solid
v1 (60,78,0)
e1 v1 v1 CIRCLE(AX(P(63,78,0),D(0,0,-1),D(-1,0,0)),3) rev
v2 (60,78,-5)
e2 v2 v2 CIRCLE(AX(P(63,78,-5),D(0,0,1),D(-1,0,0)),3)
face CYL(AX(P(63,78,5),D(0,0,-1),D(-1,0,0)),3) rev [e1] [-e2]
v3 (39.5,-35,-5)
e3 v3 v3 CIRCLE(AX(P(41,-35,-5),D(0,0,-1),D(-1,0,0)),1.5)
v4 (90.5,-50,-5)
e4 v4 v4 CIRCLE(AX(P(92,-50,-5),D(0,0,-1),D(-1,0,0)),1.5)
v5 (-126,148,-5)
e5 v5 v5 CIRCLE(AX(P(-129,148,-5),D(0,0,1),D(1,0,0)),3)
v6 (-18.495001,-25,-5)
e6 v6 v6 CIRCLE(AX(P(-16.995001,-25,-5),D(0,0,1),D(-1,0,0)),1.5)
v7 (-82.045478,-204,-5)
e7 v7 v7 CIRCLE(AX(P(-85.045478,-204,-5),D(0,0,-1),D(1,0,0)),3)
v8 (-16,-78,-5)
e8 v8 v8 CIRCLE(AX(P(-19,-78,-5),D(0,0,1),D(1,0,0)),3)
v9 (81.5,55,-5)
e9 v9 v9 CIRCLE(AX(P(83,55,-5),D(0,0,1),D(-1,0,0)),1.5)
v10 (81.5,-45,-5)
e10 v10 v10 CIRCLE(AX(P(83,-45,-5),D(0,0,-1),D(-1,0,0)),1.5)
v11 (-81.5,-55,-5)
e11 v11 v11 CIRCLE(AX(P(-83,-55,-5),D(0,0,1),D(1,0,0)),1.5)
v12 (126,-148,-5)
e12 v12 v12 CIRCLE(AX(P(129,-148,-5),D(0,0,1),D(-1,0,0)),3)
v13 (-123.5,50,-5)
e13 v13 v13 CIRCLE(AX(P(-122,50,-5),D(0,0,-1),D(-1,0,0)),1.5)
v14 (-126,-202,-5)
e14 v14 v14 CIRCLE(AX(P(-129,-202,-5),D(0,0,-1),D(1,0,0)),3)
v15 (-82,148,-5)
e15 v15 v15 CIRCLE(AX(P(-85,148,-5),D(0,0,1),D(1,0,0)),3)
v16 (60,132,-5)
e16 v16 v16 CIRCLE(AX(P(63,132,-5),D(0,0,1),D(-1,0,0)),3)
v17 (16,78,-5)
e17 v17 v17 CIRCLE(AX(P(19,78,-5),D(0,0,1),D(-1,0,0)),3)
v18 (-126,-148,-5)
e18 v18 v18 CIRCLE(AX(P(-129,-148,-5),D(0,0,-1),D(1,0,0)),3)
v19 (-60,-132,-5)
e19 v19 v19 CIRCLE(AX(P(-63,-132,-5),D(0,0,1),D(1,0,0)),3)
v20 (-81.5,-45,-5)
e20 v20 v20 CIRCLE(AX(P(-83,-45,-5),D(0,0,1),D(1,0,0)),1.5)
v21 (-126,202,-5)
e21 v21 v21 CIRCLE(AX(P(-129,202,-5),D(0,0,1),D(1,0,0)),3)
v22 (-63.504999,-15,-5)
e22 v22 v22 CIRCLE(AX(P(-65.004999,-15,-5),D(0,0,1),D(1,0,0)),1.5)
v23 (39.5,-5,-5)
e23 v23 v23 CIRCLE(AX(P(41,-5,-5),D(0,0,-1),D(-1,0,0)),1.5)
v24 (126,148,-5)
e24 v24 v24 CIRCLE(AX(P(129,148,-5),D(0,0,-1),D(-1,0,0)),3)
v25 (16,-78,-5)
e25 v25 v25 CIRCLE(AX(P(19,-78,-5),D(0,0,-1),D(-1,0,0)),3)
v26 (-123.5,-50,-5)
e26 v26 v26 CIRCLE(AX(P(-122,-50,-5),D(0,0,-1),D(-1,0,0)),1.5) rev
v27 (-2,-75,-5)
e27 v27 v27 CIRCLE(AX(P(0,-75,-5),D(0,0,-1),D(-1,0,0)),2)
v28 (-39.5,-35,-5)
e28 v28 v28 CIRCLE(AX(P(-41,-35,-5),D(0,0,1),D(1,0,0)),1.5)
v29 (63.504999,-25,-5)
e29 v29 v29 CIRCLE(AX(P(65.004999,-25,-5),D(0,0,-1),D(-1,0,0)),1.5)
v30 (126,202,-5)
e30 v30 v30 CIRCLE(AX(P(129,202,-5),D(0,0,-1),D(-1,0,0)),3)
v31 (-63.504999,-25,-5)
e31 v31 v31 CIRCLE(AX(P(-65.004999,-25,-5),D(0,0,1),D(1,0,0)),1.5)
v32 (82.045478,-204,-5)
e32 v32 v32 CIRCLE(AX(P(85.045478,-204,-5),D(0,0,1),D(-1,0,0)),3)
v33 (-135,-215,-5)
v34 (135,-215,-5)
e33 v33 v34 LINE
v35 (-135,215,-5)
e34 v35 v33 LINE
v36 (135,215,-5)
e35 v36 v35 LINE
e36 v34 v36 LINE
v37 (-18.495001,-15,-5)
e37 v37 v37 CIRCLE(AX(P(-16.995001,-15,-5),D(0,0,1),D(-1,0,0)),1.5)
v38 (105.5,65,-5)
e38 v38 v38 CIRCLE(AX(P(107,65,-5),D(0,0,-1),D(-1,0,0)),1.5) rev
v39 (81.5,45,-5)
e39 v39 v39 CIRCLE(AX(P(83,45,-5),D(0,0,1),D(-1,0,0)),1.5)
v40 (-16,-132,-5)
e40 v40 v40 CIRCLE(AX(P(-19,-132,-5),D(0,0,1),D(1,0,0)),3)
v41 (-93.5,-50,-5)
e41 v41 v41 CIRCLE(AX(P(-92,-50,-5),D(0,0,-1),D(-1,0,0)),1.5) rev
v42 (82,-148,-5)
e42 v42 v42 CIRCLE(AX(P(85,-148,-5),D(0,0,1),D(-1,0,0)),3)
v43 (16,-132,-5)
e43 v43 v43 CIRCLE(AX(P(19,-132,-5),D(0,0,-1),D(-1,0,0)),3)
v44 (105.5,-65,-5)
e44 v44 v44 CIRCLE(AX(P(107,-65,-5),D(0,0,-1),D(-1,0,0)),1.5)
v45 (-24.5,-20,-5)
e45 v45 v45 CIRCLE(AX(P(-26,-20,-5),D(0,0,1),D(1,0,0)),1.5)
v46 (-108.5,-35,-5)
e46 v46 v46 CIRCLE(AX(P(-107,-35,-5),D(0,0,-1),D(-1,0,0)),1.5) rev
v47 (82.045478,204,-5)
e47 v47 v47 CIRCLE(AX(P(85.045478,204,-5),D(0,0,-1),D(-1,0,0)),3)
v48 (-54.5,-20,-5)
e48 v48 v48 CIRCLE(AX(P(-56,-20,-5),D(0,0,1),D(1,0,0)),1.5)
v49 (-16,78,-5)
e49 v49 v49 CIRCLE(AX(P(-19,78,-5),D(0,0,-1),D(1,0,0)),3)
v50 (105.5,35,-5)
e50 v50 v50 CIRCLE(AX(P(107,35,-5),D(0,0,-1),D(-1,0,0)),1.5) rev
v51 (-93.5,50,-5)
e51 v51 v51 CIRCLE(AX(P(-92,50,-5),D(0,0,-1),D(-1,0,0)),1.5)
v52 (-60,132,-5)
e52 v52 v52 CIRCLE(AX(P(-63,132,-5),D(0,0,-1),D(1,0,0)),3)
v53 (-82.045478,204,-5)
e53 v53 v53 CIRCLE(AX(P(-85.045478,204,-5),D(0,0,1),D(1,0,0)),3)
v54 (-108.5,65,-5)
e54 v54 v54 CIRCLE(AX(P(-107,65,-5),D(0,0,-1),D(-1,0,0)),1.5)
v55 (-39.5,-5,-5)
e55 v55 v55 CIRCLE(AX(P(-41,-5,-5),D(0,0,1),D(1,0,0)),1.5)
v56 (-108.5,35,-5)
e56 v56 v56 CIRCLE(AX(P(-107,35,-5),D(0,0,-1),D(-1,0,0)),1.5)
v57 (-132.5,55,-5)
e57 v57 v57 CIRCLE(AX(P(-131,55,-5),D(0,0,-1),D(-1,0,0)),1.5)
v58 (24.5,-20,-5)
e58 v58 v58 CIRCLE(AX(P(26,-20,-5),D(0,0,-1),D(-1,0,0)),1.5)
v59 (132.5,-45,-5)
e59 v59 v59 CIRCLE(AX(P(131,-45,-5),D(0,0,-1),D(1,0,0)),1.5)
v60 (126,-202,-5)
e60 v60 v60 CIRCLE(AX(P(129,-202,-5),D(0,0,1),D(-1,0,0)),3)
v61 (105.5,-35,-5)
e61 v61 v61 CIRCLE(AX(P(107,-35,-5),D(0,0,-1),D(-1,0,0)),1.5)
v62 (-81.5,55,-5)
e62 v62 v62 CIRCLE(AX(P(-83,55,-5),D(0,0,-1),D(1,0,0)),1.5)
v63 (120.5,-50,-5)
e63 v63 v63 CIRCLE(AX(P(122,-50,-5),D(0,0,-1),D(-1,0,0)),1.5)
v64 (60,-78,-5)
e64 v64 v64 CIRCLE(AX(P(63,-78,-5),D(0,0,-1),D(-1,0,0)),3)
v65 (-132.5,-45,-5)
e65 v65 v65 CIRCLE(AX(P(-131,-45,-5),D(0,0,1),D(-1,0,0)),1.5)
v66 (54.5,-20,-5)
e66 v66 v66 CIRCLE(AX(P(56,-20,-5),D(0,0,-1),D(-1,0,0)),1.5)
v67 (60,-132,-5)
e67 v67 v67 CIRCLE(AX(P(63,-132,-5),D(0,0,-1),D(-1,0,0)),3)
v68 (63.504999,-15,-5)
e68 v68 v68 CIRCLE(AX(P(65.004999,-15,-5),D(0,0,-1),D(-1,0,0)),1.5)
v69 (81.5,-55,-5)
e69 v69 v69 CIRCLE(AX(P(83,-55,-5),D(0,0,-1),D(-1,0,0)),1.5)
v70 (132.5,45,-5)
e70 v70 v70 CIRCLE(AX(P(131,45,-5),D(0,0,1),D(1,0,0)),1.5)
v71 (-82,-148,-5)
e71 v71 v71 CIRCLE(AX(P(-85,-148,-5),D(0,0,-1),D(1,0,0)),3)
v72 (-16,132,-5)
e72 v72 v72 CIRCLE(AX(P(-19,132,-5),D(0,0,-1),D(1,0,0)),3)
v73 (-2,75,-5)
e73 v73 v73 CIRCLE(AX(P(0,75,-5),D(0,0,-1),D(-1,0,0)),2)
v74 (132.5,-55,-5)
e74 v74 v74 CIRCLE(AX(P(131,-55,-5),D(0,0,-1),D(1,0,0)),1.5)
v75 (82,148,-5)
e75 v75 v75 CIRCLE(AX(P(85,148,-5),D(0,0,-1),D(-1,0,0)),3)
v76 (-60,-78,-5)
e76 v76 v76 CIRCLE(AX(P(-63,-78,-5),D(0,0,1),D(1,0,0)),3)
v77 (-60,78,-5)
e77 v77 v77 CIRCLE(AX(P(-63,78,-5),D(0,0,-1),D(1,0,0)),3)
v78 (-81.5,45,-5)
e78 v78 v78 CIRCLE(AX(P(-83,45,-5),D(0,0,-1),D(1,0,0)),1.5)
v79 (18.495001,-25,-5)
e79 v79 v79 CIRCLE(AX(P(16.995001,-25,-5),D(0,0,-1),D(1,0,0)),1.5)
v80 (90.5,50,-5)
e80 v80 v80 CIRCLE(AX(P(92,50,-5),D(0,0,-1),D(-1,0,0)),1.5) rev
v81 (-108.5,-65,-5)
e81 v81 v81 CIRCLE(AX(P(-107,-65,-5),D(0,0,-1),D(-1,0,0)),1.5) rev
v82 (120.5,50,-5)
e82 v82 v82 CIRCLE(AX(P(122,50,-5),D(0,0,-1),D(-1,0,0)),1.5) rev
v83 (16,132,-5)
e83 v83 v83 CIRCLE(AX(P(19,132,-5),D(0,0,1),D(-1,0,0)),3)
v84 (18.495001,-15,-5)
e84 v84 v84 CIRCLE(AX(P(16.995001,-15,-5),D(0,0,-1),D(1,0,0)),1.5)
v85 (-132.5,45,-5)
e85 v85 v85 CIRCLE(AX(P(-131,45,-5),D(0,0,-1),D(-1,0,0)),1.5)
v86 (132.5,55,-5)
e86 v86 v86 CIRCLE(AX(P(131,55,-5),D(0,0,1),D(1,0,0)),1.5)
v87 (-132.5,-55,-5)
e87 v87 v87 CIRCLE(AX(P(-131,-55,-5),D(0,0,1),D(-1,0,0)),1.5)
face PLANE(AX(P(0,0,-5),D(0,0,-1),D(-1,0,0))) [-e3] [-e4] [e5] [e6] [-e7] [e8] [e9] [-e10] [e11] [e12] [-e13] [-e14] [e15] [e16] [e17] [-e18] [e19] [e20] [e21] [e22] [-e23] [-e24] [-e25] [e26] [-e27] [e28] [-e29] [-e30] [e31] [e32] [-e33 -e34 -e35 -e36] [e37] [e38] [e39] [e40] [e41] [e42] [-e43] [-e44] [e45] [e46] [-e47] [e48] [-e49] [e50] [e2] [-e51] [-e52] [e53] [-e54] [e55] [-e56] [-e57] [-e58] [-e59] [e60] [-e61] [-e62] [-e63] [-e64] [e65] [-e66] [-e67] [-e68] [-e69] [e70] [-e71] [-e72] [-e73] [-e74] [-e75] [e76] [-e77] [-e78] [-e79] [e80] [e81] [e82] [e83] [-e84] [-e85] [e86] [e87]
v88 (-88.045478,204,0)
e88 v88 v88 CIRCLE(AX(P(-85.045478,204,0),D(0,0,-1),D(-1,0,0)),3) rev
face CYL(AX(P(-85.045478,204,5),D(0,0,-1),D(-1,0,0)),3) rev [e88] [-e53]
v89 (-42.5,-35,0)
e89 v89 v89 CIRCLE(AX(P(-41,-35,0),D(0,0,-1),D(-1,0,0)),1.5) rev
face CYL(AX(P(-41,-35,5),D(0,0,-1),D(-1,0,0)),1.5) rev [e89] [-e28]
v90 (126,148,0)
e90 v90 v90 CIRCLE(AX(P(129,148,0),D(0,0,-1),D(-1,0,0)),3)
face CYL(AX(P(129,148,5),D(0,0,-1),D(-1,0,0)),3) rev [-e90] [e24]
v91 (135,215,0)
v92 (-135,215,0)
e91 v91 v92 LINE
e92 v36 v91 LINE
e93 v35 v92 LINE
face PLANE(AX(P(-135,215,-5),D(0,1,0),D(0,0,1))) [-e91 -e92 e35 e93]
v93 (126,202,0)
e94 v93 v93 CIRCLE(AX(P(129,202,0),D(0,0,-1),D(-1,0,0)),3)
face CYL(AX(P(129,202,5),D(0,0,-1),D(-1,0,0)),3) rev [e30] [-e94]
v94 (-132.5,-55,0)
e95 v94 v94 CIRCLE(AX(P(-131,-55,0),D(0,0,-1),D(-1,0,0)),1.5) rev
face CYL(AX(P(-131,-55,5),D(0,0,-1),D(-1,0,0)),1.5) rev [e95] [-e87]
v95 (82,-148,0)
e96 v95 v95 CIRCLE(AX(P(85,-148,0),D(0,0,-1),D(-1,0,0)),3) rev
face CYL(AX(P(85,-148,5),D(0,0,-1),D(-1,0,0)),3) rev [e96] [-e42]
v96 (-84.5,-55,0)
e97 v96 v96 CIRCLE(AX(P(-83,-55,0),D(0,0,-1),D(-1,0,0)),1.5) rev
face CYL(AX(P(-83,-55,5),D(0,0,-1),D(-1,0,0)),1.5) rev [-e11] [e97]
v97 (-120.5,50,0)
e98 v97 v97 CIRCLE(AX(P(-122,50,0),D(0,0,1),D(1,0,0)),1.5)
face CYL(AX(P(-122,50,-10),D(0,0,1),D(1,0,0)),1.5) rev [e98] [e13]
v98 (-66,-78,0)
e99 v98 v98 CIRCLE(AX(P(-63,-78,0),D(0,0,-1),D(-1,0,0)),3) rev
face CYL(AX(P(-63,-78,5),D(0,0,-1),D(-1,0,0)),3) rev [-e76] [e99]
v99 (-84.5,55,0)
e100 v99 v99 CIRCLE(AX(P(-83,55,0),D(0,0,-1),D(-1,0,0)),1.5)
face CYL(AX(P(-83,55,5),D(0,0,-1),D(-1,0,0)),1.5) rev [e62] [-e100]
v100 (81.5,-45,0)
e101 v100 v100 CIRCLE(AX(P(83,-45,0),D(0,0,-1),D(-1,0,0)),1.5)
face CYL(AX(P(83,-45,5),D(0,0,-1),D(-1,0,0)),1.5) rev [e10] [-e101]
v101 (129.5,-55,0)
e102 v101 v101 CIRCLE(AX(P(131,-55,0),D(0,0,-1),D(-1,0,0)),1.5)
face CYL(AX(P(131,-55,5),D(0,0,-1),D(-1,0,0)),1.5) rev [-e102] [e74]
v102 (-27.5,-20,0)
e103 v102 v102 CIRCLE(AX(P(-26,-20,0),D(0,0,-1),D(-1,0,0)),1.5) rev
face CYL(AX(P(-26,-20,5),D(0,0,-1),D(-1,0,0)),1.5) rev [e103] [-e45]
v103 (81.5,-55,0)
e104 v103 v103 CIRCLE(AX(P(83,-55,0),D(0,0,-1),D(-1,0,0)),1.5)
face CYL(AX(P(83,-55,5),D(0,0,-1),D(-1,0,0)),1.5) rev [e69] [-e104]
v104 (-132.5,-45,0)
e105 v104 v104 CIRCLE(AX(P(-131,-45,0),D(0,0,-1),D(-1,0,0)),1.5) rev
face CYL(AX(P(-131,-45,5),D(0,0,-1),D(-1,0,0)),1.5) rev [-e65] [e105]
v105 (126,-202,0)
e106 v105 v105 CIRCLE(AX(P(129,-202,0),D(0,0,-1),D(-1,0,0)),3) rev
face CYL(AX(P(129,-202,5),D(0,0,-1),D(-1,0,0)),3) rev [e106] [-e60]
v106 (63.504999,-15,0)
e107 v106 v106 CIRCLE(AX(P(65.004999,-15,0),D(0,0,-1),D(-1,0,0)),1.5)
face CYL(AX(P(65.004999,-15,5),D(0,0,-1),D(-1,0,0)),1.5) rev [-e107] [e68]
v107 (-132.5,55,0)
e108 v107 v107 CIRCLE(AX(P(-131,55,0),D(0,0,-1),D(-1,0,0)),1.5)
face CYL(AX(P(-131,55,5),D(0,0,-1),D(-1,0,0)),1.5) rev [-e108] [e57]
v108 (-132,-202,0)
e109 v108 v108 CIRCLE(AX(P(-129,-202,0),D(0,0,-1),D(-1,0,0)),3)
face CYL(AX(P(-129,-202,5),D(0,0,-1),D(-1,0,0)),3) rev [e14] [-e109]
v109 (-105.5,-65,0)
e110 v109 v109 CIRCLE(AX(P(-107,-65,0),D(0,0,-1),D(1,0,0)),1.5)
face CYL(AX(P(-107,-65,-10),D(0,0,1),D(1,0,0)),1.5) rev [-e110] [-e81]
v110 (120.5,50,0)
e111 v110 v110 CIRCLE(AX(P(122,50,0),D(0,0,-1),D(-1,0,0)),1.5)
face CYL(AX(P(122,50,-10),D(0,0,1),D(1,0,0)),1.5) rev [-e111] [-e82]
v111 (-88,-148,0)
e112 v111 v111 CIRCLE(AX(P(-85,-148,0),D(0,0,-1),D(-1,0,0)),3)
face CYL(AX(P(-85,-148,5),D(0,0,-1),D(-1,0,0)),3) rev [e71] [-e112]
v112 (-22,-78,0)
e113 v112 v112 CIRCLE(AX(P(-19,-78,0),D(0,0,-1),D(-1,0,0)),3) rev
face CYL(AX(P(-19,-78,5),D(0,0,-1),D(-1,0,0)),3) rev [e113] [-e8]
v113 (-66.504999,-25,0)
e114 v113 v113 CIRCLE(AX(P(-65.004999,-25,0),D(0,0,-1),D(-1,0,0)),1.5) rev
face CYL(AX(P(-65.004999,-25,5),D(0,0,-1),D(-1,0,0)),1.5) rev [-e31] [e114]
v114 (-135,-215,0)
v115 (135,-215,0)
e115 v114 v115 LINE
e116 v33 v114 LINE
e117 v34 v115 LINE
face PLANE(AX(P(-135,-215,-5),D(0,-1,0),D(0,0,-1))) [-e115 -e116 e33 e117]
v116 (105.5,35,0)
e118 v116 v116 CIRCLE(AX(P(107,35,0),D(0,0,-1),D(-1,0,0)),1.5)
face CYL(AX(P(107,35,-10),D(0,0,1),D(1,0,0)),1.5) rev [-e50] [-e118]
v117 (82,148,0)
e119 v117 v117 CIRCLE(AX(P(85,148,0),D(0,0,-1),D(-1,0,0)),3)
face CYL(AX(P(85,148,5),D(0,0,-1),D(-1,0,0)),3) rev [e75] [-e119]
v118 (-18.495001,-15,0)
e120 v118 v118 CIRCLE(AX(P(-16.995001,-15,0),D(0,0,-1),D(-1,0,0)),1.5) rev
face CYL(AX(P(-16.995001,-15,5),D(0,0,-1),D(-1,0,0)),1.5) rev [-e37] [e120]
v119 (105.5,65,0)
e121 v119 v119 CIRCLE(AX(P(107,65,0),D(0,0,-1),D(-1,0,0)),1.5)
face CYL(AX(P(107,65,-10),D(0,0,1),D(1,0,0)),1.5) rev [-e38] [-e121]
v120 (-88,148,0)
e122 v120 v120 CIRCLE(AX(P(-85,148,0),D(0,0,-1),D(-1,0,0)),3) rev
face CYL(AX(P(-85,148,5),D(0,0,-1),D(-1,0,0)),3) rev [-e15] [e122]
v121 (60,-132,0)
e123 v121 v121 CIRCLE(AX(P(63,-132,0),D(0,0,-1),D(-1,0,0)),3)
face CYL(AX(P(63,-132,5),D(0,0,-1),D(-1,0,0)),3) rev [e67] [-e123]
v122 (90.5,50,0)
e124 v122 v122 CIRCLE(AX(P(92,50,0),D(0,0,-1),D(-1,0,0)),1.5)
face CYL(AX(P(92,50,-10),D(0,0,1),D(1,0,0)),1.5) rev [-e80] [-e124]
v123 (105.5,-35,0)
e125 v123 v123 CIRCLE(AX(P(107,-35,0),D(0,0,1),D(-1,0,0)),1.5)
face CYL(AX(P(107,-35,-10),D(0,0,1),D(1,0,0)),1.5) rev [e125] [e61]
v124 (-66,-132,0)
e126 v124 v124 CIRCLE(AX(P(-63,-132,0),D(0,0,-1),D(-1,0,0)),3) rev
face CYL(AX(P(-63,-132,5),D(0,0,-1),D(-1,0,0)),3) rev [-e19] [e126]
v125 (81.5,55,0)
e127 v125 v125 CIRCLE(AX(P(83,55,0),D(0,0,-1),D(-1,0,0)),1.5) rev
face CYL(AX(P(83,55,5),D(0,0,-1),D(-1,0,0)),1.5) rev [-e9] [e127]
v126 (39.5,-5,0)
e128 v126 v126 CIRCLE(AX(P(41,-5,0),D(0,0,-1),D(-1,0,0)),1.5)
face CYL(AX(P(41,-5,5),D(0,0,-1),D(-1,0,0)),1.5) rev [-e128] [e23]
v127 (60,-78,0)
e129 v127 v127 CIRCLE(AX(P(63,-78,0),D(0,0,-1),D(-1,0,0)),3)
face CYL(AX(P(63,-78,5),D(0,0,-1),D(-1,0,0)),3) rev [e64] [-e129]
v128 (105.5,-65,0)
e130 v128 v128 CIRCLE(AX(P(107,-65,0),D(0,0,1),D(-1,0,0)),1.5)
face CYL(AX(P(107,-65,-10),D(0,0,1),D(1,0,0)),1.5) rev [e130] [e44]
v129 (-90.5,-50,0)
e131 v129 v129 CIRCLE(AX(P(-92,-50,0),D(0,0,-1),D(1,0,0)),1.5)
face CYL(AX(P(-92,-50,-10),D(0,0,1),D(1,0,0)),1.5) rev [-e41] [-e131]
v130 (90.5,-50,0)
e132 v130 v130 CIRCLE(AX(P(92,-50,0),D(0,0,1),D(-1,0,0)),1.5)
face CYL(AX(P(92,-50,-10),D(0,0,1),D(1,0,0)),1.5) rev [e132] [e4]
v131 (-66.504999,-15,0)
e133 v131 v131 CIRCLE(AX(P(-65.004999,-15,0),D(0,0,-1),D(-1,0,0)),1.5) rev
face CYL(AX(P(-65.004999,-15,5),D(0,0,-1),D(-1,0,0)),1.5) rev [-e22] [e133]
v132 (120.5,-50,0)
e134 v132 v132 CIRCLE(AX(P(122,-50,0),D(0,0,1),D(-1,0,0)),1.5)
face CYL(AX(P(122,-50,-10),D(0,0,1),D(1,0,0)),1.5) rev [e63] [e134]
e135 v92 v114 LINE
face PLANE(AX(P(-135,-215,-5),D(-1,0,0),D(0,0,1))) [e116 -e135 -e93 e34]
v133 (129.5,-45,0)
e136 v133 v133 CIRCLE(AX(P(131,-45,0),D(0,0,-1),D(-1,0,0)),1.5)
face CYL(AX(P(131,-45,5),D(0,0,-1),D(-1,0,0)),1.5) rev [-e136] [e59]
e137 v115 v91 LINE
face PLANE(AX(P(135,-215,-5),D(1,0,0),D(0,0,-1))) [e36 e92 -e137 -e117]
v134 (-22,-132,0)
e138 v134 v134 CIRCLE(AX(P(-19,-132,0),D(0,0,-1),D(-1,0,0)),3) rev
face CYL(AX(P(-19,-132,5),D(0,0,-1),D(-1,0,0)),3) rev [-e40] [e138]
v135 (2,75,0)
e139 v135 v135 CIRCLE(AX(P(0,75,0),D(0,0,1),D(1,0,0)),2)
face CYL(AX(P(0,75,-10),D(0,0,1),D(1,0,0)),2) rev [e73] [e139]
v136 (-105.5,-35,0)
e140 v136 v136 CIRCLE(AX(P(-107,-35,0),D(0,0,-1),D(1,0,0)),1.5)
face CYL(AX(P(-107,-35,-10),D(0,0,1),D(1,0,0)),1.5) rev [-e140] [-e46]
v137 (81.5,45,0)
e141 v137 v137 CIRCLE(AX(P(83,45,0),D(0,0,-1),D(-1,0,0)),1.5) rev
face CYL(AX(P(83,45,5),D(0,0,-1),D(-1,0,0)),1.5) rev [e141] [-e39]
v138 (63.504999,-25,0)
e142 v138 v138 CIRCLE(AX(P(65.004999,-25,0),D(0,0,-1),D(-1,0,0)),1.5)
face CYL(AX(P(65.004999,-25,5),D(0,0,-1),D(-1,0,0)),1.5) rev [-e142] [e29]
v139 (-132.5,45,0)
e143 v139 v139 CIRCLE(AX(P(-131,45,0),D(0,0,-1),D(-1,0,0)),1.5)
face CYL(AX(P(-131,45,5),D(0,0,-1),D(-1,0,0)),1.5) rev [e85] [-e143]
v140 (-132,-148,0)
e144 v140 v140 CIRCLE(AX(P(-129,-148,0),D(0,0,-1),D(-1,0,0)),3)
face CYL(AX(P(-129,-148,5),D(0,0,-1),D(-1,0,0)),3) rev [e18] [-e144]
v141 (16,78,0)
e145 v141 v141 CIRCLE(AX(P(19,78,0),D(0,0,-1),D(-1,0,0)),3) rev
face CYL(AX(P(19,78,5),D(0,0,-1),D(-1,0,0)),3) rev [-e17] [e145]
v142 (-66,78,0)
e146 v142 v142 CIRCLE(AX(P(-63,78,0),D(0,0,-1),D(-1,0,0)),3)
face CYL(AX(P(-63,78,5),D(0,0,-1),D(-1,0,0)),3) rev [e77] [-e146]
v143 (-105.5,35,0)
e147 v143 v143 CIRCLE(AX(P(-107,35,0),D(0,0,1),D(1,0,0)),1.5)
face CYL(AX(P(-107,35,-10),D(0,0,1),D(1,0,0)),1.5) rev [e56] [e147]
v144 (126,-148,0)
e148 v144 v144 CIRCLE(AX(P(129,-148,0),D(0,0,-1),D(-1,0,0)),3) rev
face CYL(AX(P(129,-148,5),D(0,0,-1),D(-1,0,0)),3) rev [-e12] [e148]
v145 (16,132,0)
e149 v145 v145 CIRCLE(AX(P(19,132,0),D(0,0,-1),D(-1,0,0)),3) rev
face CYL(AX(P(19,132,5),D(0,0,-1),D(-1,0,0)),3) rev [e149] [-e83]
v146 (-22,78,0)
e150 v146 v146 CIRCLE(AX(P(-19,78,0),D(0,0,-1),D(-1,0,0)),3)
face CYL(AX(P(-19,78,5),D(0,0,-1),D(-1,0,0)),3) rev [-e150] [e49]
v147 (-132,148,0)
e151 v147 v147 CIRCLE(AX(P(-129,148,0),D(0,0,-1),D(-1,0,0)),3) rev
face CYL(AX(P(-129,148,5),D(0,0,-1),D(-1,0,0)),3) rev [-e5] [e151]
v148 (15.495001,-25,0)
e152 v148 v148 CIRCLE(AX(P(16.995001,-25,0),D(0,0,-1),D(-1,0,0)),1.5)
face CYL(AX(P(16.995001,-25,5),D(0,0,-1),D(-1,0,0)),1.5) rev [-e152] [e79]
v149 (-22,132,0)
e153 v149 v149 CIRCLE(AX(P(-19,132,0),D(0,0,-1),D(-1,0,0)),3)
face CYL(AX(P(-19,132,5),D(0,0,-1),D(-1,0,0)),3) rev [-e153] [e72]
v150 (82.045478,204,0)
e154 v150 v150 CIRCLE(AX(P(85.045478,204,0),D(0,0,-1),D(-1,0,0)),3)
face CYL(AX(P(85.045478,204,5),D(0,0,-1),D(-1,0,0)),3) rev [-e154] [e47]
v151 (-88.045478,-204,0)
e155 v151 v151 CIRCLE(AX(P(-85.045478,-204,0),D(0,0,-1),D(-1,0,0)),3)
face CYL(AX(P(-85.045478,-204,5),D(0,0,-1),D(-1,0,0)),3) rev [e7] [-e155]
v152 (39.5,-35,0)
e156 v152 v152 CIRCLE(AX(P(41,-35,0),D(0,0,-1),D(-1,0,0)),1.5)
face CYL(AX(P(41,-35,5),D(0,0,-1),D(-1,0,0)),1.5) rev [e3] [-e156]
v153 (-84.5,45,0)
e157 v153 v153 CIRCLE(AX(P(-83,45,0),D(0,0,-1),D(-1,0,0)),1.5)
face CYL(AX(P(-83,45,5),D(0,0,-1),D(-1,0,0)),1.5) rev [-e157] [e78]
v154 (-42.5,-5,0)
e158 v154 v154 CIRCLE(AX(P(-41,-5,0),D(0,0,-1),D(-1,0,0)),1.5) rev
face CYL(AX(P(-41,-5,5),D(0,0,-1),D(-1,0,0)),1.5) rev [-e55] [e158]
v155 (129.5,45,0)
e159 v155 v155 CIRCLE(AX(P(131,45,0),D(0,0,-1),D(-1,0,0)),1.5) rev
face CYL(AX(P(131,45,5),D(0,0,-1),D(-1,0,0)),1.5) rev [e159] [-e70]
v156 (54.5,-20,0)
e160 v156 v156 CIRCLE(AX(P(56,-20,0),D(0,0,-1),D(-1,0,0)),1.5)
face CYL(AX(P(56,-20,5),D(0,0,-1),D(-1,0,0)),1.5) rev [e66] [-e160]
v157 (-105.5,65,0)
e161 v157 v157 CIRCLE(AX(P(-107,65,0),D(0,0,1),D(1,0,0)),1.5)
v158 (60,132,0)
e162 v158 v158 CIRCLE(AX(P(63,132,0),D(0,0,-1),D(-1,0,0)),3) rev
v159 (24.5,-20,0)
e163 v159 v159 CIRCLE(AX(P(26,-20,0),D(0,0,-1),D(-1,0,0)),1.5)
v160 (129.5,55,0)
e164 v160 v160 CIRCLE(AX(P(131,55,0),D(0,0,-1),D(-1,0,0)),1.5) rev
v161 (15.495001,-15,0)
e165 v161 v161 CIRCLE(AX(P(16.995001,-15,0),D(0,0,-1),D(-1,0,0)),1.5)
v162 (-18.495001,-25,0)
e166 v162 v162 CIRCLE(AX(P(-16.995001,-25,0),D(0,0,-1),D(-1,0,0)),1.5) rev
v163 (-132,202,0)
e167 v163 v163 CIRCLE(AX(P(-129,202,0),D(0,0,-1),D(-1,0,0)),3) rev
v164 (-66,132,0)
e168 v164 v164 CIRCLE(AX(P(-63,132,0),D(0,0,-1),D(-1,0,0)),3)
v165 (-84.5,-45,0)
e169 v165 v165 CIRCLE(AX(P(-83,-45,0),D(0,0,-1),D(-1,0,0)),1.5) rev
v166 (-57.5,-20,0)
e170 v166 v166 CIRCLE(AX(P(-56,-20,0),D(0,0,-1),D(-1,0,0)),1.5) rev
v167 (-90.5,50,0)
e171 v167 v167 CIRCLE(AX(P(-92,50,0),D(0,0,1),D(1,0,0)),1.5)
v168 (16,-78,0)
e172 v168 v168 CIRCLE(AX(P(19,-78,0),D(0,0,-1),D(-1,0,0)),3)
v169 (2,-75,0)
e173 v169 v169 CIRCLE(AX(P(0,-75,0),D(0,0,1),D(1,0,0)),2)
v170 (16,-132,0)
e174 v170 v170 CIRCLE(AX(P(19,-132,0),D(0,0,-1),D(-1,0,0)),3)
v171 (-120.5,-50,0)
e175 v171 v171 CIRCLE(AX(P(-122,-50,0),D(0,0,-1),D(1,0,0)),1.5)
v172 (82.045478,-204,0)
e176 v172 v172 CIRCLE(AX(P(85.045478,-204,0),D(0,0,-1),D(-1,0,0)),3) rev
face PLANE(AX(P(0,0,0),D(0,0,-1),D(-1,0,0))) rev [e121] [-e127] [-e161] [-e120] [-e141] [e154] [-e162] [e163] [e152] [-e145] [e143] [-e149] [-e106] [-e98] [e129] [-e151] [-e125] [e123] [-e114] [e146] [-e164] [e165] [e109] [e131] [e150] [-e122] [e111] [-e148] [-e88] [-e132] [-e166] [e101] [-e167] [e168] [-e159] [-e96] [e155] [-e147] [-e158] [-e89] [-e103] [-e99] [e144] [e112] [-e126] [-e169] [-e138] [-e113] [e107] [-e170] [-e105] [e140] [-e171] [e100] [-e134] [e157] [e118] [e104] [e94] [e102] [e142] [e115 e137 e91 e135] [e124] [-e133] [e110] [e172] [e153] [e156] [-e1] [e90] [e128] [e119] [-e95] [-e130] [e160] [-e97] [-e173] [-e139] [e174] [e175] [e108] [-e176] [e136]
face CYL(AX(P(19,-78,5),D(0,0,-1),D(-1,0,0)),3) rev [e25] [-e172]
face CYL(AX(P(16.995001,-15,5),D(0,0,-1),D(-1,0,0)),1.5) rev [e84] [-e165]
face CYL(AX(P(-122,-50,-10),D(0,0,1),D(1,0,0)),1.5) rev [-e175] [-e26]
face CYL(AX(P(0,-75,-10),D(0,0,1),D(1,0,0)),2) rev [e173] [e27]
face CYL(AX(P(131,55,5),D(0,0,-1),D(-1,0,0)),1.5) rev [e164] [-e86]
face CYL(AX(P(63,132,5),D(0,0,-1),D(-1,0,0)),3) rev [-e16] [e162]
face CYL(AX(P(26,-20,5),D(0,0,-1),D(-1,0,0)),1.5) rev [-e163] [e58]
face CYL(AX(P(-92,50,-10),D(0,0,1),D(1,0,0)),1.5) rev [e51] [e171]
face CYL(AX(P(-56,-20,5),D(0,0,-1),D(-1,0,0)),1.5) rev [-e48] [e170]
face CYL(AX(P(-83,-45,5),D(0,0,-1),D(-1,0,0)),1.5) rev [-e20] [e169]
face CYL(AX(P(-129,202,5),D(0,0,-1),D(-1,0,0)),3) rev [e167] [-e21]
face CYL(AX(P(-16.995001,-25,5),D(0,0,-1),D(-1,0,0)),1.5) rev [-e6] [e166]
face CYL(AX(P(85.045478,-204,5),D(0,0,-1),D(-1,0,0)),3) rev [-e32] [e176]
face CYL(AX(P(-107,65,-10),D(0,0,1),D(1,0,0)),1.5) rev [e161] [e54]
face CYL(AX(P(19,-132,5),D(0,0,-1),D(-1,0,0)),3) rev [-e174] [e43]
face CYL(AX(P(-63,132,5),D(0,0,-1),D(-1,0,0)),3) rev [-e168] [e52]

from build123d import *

# Parameters (mm, degrees)
SKETCH_1_W               = 270
SKETCH_1_H               = 430
SM_BASE_FLANGE_366_DEPTH = 5
SKETCH_9_R               = 2
CUT_EXTRUDE_4_DEPTH      = 10
SKETCH_10_R              = 1.5
CUT_EXTRUDE_5_DEPTH      = 10
SKETCH_11_R              = 1.5
CUT_EXTRUDE_6_DEPTH      = 10
MIRROR_4_COPY_1_SKETCH_R = 1.5
MIRROR_4_COPY_1_DEPTH    = 10
MIRROR_4_COPY_2_SKETCH_R = 1.5
MIRROR_4_COPY_2_DEPTH    = 10
SKETCH_12_R              = 3
CUT_EXTRUDE_7_DEPTH      = 10
MIRROR_6_COPY_1_SKETCH_R = 3
MIRROR_6_COPY_1_DEPTH    = 10
SKETCH_13_R              = 3
CUT_EXTRUDE_8_DEPTH      = 10
MIRROR_8_COPY_1_SKETCH_R = 3
MIRROR_8_COPY_1_DEPTH    = 10
SKETCH_14_R              = 1.5
CUT_EXTRUDE_9_DEPTH      = 10


# Sheet-metal steps are written as plain solids
with BuildPart() as part:
    # Sketch 1 → Sm Base Flange 366 (new body)
    with BuildSketch(Plane.XY):
        Rectangle(SKETCH_1_W, SKETCH_1_H)
    extrude(amount=-SM_BASE_FLANGE_366_DEPTH)

    # 草图9 → 切除-拉伸4 (cut)
    with BuildSketch(Plane.XY):
        with Locations((0, 75)):
            Circle(SKETCH_9_R)
        with Locations((0, -75)):
            Circle(SKETCH_9_R)
    extrude(amount=-CUT_EXTRUDE_4_DEPTH, mode=Mode.SUBTRACT)

    # 草图10 → 切除-拉伸5 (cut)
    with BuildSketch(Plane.XY):
        with Locations((-107, 65)):
            Circle(SKETCH_10_R)
        with Locations((-92, 50)):
            Circle(SKETCH_10_R)
        with Locations((-107, 35)):
            Circle(SKETCH_10_R)
        with Locations((-122, 50)):
            Circle(SKETCH_10_R)
    cut_extrude_5 = extrude(amount=-CUT_EXTRUDE_5_DEPTH, mode=Mode.SUBTRACT)

    # 草图11 → 切除-拉伸6 (cut)
    with BuildSketch(Plane(origin=(0, 0, -5), x_dir=(-1, 0, 0), z_dir=(0, 0, -1))):
        with Locations((131, 55)):
            Circle(SKETCH_11_R)
        with Locations((131, 45)):
            Circle(SKETCH_11_R)
        with Locations((83, 45)):
            Circle(SKETCH_11_R)
        with Locations((83, 55)):
            Circle(SKETCH_11_R)
    cut_extrude_6 = extrude(amount=-CUT_EXTRUDE_6_DEPTH, mode=Mode.SUBTRACT)

    # 镜向3: 切除-拉伸5, 切除-拉伸6 across plane
    add(cut_extrude_5.mirror(Plane(origin=(0, 0, 0), x_dir=(0, 0, 1), z_dir=(1, 0, 0))), mode=Mode.SUBTRACT)
    add(cut_extrude_6.mirror(Plane(origin=(0, 0, 0), x_dir=(0, 0, 1), z_dir=(1, 0, 0))), mode=Mode.SUBTRACT)

    # 镜向4: 切除-拉伸5, 切除-拉伸6 across plane
    add(cut_extrude_5.mirror(Plane.ZX), mode=Mode.SUBTRACT)
    add(cut_extrude_6.mirror(Plane.ZX), mode=Mode.SUBTRACT)

    # 镜向4 copy 1 sketch → 镜向4 copy 1 (cut)
    with BuildSketch(Plane(origin=(0, 0, 0), x_dir=(-1, 0, 0), z_dir=(0, 0, 1))):
        with Locations((-107, 65)):
            Circle(MIRROR_4_COPY_1_SKETCH_R)
        with Locations((-92, 50)):
            Circle(MIRROR_4_COPY_1_SKETCH_R)
        with Locations((-107, 35)):
            Circle(MIRROR_4_COPY_1_SKETCH_R)
        with Locations((-122, 50)):
            Circle(MIRROR_4_COPY_1_SKETCH_R)
    extrude(amount=-MIRROR_4_COPY_1_DEPTH, mode=Mode.SUBTRACT)

    # 镜向4 copy 2 sketch → 镜向4 copy 2 (cut)
    with BuildSketch(Plane(origin=(0, 0, -5), x_dir=(1, 0, 0), z_dir=(0, 0, -1))):
        with Locations((131, 55)):
            Circle(MIRROR_4_COPY_2_SKETCH_R)
        with Locations((131, 45)):
            Circle(MIRROR_4_COPY_2_SKETCH_R)
        with Locations((83, 45)):
            Circle(MIRROR_4_COPY_2_SKETCH_R)
        with Locations((83, 55)):
            Circle(MIRROR_4_COPY_2_SKETCH_R)
    extrude(amount=-MIRROR_4_COPY_2_DEPTH, mode=Mode.SUBTRACT)

    # 草图12 → 切除-拉伸7 (cut)
    with BuildSketch(Plane(origin=(0, 0, -5), x_dir=(-1, 0, 0), z_dir=(0, 0, -1))):
        with Locations((-129, 202)):
            Circle(SKETCH_12_R)
        with Locations((-129, 148)):
            Circle(SKETCH_12_R)
        with Locations((-85.045478048, 204)):
            Circle(SKETCH_12_R)
        with Locations((-85, 148)):
            Circle(SKETCH_12_R)
    cut_extrude_7 = extrude(amount=-CUT_EXTRUDE_7_DEPTH, mode=Mode.SUBTRACT)

    # 镜向5: 切除-拉伸7 across plane
    add(cut_extrude_7.mirror(Plane.ZX), mode=Mode.SUBTRACT)

    # 镜向6: 切除-拉伸7 across plane
    add(cut_extrude_7.mirror(Plane(origin=(0, 0, 0), x_dir=(0, 0, 1), z_dir=(1, 0, 0))), mode=Mode.SUBTRACT)

    # 镜向6 copy 1 sketch → 镜向6 copy 1 (cut)
    with BuildSketch(Plane(origin=(0, 0, -5), x_dir=(1, 0, 0), z_dir=(0, 0, -1))):
        with Locations((-129, 202)):
            Circle(MIRROR_6_COPY_1_SKETCH_R)
        with Locations((-129, 148)):
            Circle(MIRROR_6_COPY_1_SKETCH_R)
        with Locations((-85.045478048, 204)):
            Circle(MIRROR_6_COPY_1_SKETCH_R)
        with Locations((-85, 148)):
            Circle(MIRROR_6_COPY_1_SKETCH_R)
    extrude(amount=-MIRROR_6_COPY_1_DEPTH, mode=Mode.SUBTRACT)

    # 草图13 → 切除-拉伸8 (cut)
    with BuildSketch(Plane(origin=(0, 0, -5), x_dir=(-1, 0, 0), z_dir=(0, 0, -1))):
        with Locations((-63, -132)):
            Circle(SKETCH_13_R)
        with Locations((-63, -78)):
            Circle(SKETCH_13_R)
        with Locations((-19, -78)):
            Circle(SKETCH_13_R)
        with Locations((-19, -132)):
            Circle(SKETCH_13_R)
    cut_extrude_8 = extrude(amount=-CUT_EXTRUDE_8_DEPTH, mode=Mode.SUBTRACT)

    # 镜向7: 切除-拉伸8 across plane
    add(cut_extrude_8.mirror(Plane(origin=(0, 0, 0), x_dir=(0, 0, 1), z_dir=(1, 0, 0))), mode=Mode.SUBTRACT)

    # 镜向8: 切除-拉伸8 across plane
    add(cut_extrude_8.mirror(Plane.ZX), mode=Mode.SUBTRACT)

    # 镜向8 copy 1 sketch → 镜向8 copy 1 (cut)
    with BuildSketch(Plane(origin=(0, 0, -5), x_dir=(1, 0, 0), z_dir=(0, 0, -1))):
        with Locations((-63, -132)):
            Circle(MIRROR_8_COPY_1_SKETCH_R)
        with Locations((-63, -78)):
            Circle(MIRROR_8_COPY_1_SKETCH_R)
        with Locations((-19, -78)):
            Circle(MIRROR_8_COPY_1_SKETCH_R)
        with Locations((-19, -132)):
            Circle(MIRROR_8_COPY_1_SKETCH_R)
    extrude(amount=-MIRROR_8_COPY_1_DEPTH, mode=Mode.SUBTRACT)

    # 草图14 → 切除-拉伸9 (cut)
    with BuildSketch(Plane(origin=(0, 0, -5), x_dir=(-1, 0, 0), z_dir=(0, 0, -1))):
        with Locations((-41, -5)):
            Circle(SKETCH_14_R)
        with Locations((-26, -20)):
            Circle(SKETCH_14_R)
        with Locations((-41, -35)):
            Circle(SKETCH_14_R)
        with Locations((-56, -20)):
            Circle(SKETCH_14_R)
        with Locations((-65.004998612, -15)):
            Circle(SKETCH_14_R)
        with Locations((-65.004998612, -25)):
            Circle(SKETCH_14_R)
        with Locations((-16.995001388, -25)):
            Circle(SKETCH_14_R)
        with Locations((-16.995001388, -15)):
            Circle(SKETCH_14_R)
    cut_extrude_9 = extrude(amount=-CUT_EXTRUDE_9_DEPTH, mode=Mode.SUBTRACT)

    # 镜向9: 切除-拉伸9 across plane
    add(cut_extrude_9.mirror(Plane(origin=(0, 0, 0), x_dir=(0, 0, 1), z_dir=(1, 0, 0))), mode=Mode.SUBTRACT)


solid = part.part
